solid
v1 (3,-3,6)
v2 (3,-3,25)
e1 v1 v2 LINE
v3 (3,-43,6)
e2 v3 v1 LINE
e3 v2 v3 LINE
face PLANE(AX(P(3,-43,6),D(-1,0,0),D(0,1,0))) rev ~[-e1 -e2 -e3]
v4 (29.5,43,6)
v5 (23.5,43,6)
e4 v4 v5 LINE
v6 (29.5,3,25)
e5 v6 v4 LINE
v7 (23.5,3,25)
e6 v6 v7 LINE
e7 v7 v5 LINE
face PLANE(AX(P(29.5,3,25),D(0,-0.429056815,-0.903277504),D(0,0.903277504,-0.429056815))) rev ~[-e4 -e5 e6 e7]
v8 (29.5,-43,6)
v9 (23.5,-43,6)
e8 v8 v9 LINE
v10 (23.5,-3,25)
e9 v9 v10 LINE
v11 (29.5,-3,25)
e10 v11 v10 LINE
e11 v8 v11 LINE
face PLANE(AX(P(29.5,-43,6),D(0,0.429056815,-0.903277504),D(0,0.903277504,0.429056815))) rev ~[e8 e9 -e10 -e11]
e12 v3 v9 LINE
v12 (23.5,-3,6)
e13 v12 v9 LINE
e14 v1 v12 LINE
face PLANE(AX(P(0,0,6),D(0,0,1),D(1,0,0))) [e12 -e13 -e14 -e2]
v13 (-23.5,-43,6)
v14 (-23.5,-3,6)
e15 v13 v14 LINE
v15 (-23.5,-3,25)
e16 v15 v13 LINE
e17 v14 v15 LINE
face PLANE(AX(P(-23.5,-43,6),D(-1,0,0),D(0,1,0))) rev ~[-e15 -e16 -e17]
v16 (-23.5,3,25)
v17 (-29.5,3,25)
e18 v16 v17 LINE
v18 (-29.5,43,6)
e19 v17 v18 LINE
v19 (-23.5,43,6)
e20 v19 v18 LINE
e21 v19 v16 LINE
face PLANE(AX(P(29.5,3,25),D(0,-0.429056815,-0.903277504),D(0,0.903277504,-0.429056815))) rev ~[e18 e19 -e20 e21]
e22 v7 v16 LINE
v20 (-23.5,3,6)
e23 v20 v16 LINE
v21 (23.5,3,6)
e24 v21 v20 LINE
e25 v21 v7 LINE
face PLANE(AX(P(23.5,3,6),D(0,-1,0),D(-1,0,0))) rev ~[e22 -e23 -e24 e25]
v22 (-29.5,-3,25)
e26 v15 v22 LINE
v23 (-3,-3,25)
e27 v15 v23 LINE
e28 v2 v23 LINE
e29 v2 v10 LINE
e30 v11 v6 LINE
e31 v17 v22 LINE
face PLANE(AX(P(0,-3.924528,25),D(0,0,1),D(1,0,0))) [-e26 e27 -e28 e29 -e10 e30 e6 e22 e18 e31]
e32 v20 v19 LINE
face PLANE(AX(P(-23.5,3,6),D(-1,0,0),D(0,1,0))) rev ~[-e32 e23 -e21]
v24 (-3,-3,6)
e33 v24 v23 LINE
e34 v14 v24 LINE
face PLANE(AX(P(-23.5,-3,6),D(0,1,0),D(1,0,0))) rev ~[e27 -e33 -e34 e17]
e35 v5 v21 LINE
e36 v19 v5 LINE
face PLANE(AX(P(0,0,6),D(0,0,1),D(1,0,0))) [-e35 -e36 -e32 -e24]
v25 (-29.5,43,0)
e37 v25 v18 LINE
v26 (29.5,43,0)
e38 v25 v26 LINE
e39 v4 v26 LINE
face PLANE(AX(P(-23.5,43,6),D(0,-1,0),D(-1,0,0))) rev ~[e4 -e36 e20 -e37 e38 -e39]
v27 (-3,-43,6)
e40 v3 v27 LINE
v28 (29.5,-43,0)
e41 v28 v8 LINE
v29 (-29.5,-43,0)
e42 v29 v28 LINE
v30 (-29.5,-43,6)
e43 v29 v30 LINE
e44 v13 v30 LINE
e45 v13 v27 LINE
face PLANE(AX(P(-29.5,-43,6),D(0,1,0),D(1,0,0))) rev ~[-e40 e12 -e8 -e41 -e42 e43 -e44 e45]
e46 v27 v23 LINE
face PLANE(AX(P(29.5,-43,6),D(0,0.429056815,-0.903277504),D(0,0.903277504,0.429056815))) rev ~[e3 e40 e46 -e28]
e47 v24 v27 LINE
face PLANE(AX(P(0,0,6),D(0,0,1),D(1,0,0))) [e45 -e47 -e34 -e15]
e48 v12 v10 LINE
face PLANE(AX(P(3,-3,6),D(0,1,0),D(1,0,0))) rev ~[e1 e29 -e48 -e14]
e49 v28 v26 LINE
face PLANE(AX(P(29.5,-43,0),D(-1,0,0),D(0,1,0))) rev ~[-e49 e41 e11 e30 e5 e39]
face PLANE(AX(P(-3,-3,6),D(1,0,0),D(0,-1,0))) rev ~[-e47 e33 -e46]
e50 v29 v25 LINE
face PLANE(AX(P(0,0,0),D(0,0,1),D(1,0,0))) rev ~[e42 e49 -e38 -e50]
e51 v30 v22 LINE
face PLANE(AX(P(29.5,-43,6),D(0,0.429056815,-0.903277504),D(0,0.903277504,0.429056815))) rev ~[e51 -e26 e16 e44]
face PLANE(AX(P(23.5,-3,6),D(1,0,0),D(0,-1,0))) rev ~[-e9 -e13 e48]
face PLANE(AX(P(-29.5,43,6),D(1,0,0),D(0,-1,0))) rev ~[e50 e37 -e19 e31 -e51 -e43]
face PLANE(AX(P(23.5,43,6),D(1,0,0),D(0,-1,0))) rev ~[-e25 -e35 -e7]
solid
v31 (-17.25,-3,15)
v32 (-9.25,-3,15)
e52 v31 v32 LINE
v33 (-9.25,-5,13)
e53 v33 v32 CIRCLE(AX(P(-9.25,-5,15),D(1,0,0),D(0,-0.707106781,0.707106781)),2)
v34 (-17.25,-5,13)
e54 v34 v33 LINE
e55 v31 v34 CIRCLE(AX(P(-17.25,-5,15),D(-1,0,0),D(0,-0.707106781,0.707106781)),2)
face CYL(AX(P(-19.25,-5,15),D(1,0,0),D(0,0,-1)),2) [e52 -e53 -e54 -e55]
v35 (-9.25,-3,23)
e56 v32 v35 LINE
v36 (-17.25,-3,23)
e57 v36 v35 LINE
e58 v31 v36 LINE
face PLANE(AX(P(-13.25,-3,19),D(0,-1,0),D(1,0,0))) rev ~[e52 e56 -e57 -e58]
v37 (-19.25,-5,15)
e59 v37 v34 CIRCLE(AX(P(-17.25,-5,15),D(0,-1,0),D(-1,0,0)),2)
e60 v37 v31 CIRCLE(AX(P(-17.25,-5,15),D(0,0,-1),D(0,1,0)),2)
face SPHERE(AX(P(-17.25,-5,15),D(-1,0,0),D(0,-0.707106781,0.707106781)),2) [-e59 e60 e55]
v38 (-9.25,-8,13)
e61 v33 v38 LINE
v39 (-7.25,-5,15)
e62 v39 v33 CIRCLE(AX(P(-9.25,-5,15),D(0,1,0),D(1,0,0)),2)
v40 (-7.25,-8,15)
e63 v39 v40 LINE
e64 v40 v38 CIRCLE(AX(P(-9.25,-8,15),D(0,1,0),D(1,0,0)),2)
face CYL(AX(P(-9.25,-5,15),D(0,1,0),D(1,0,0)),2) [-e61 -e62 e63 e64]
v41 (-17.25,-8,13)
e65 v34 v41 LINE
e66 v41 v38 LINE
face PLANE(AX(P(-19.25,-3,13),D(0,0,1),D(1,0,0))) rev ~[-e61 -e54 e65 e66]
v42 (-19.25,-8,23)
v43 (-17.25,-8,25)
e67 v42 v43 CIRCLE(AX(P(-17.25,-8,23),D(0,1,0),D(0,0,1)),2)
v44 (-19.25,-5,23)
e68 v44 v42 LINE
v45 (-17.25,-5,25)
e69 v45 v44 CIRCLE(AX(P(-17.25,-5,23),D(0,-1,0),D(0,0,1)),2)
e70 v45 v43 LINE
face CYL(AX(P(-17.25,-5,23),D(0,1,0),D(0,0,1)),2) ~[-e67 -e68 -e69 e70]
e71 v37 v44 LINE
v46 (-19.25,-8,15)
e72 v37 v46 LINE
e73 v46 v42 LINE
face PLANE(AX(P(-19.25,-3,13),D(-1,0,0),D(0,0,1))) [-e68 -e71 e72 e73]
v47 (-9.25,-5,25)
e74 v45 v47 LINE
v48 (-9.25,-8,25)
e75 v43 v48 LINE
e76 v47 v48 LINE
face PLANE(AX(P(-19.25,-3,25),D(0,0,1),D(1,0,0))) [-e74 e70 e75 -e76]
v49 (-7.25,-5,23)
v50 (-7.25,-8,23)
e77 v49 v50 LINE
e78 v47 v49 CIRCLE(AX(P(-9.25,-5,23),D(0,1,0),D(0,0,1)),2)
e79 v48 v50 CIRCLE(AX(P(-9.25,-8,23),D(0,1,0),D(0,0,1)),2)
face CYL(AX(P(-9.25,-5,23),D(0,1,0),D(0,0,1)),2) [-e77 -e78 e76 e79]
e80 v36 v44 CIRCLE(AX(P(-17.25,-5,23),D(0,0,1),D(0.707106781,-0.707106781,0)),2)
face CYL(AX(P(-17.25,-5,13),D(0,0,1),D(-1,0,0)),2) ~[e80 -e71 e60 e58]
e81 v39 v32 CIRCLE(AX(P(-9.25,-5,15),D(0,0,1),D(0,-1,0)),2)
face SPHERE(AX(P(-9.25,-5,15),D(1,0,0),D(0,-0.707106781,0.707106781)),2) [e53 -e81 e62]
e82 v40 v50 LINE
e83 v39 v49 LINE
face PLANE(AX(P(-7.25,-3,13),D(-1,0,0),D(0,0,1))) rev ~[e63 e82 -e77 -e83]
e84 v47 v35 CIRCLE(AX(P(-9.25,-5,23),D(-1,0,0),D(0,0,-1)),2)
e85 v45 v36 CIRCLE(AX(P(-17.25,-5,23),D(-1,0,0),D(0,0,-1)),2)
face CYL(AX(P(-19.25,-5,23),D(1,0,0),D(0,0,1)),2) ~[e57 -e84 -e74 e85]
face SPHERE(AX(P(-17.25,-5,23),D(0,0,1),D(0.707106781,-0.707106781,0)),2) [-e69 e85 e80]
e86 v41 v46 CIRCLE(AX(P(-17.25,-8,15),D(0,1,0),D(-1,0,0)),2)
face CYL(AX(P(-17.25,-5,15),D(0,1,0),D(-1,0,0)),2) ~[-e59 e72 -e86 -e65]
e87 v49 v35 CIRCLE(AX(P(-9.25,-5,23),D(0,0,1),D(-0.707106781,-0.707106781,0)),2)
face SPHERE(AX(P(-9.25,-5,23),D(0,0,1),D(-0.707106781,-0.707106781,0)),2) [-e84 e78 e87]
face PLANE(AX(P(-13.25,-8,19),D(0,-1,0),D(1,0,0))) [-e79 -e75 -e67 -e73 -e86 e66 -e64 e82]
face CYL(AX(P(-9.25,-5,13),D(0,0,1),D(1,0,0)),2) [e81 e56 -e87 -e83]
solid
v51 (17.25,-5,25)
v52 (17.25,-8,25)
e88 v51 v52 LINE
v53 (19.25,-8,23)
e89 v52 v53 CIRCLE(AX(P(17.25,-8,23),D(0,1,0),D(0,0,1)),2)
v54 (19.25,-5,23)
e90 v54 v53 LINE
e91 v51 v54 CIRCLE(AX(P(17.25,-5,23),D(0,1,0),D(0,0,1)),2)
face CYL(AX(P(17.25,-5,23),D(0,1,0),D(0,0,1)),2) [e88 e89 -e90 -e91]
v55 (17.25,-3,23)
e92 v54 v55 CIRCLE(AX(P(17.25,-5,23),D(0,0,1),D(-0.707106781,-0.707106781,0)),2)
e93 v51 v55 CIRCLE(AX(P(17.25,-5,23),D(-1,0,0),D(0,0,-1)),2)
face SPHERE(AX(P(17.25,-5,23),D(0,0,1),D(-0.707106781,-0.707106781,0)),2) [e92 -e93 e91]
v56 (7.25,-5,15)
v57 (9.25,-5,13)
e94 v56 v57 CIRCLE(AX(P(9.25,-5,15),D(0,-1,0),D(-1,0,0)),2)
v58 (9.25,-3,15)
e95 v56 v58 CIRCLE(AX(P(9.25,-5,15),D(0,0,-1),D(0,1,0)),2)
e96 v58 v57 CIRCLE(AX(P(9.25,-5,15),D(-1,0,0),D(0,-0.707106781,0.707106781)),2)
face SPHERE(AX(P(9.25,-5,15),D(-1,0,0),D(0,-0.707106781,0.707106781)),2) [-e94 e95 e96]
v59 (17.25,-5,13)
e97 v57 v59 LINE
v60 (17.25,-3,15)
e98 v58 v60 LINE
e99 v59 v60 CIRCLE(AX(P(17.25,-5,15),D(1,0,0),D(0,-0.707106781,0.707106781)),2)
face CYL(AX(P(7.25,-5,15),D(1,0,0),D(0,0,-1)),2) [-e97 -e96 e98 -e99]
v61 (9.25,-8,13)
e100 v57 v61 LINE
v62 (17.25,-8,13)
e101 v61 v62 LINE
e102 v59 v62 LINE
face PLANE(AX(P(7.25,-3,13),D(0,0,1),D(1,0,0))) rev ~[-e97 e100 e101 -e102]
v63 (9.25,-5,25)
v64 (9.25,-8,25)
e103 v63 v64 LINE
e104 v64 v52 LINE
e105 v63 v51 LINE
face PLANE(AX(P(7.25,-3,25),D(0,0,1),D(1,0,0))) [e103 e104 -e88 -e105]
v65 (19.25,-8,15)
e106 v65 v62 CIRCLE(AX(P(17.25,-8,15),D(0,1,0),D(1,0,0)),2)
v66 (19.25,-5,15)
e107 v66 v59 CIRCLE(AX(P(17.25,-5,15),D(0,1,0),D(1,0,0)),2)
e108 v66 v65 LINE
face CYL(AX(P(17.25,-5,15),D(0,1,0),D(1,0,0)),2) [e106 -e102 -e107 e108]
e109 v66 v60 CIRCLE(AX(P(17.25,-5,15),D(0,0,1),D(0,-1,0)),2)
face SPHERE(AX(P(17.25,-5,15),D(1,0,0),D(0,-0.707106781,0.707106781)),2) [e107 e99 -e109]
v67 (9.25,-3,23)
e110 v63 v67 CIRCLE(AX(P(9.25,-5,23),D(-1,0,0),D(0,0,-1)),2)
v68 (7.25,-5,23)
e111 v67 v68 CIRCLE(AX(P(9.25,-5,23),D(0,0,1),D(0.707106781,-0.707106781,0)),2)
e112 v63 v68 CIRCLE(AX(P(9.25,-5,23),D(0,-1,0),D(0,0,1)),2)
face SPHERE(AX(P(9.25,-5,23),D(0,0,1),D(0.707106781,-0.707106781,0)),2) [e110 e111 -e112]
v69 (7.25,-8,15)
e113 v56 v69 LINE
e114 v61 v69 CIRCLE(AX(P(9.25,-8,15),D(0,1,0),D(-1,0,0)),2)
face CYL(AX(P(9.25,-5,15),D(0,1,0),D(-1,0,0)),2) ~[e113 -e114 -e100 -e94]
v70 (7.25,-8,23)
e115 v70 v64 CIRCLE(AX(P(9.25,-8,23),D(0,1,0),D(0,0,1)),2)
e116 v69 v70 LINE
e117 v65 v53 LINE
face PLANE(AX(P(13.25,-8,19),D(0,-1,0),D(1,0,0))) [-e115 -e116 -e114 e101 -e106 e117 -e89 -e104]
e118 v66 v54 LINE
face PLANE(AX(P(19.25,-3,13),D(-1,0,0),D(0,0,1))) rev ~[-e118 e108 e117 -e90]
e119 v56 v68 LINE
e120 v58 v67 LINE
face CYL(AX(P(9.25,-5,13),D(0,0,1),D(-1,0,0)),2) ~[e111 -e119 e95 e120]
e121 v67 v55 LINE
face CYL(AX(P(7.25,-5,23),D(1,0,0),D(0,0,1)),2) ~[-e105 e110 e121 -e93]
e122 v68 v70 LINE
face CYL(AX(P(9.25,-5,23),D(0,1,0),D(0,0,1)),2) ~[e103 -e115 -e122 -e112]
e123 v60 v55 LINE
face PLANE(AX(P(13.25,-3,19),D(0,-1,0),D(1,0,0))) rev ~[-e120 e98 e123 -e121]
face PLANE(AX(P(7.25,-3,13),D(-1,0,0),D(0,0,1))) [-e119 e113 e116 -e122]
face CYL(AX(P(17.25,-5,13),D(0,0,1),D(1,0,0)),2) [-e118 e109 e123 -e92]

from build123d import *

# Parameters (mm, degrees)
F0_W            = 59
F0_H            = 86
F1_DEPTH        = 6
F3_DEPTH        = 19
F5_DEPTH        = 59.001
F6_W            = 12
F6_H            = 12
F7_DEPTH        = 5
F8_R            = 2
F9_T1_DEPTH     = 8
F9_S5_W         = 2
F9_S5_H         = 2
F9_T6_DEPTH     = 2
F9_S11_W        = 2
F9_S11_H        = 2
F9_T12_DEPTH    = 2
F9_S17_W        = 2
F9_S17_H        = 2
F9_T18_DEPTH    = 2
F9_S23_W        = 2
F9_S23_H        = 2
F9_T24_DEPTH    = 2
F9_S1_T1_DEPTH  = 8
F9_S1_S5_W      = 2
F9_S1_S5_H      = 2
F9_S1_T6_DEPTH  = 2
F9_S1_S11_W     = 2
F9_S1_S11_H     = 2
F9_S1_T12_DEPTH = 2
F9_S1_S17_W     = 2
F9_S1_S17_H     = 2
F9_S1_T18_DEPTH = 2
F9_S1_S23_W     = 2
F9_S1_S23_H     = 2
F9_S1_T24_DEPTH = 2


# Not quite as in the source:
# - a fillet or chamfer that OpenCascade refuses, or shapes differently, is made with other operations: its cross-section is extruded or revolved along the edge and cut away or added


with BuildPart() as f1:
    # F0 (on Top) → F1 (new body)
    with BuildSketch(Plane.XY):
        Rectangle(F0_W, F0_H)
    extrude(amount=F1_DEPTH)

    # F2 (on face) → F3 (join)
    with BuildSketch(Plane.XY.offset(6)):
        Polygon((-23.5, 43), (-29.5, 43), (-29.5, -43), (-23.5, -43), (-23.5, -3), (-3, -3), (-3, -43), (3, -43), (3, -3), (23.5, -3), (23.5, -43), (29.5, -43), (29.5, 43), (23.5, 43), (23.5, 3), (-23.5, 3), align=None)
    extrude(amount=F3_DEPTH)

    # F4 (on face) → F5 (cut, through all)
    with BuildSketch(Plane.YZ.offset(29.5)):
        Polygon((-43, 25), (-43, 6), (-3, 25), align=None)
        Polygon((43, 25), (3, 25), (43, 6), align=None)
    extrude(amount=-F5_DEPTH, mode=Mode.SUBTRACT)


with BuildPart() as f7:
    # F6 (on face) → F7 (new body)
    with BuildSketch(Plane.XZ.offset(3)):
        with Locations((-13.25, 19)):
            Rectangle(F6_W, F6_H)
        with Locations((13.25, 19)):
            Rectangle(F6_W, F6_H)
    extrude(amount=F7_DEPTH)

    # F8
    f8_edges = [f7.edges().sort_by_distance(p)[0] for p in [
        (-7.25, -3, 19),
        (-13.25, -3, 25),
        (-19.25, -3, 19),
        (-13.25, -3, 13),
        (13.25, -3, 13),
        (7.25, -3, 19),
        (19.25, -3, 19),
        (13.25, -3, 25),
    ]]
    fillet(f8_edges, radius=F8_R)

    # F9: fillet of radius 2 on 4 edges, made by hand

    # F9_s2 → F9_t1 (cut)
    with BuildSketch(Plane.XZ.offset(5)):
        with BuildLine():
            ThreePointArc((-7.25, 15), (-7.8357864376, 13.5857864376), (-9.25, 13))
            Line((-9.25, 13), (-7.25, 13))
            Line((-7.25, 13), (-7.25, 15))
        make_face()
        with BuildLine():
            ThreePointArc((-19.25, 15), (-18.6642135624, 13.5857864376), (-17.25, 13))
            Line((-17.25, 13), (-19.25, 13))
            Line((-19.25, 13), (-19.25, 15))
        make_face()
        with BuildLine():
            ThreePointArc((-9.25, 25), (-7.8357864376, 24.4142135624), (-7.25, 23))
            Line((-7.25, 23), (-7.25, 25))
            Line((-7.25, 25), (-9.25, 25))
        make_face()
        with BuildLine():
            ThreePointArc((-17.25, 25), (-18.6642135624, 24.4142135624), (-19.25, 23))
            Line((-19.25, 23), (-19.25, 25))
            Line((-19.25, 25), (-17.25, 25))
        make_face()
    extrude(amount=F9_T1_DEPTH, mode=Mode.SUBTRACT)


with BuildPart() as f9_tool4:
    # F9_s5 → F9_t6 (new body)
    with BuildSketch(Plane.XY.offset(23)):
        with Locations((-18.25, -4)):
            Rectangle(F9_S5_W, F9_S5_H)
    extrude(amount=F9_T6_DEPTH)

    # F9_s7 → F9_t8 (revolve, cut)
    with BuildSketch(Plane(origin=(-17.25, -5, 23), x_dir=(0.7071067812, -0.7071067812, 0), z_dir=(-0.7071067812, -0.7071067812, 0))):
        with BuildLine():
            ThreePointArc((0, -2), (2, 0), (0, 2))
            Line((0, 2), (0, -2))
        make_face()
    revolve(axis=Axis((-17.25, -5, 23), (0, 0, 1)), mode=Mode.SUBTRACT)


with BuildPart() as f7_1:
    add(f7.part)

    # F9_t3: cut F9_tool4
    add(f9_tool4.part, mode=Mode.SUBTRACT)


with BuildPart() as f9_tool10:
    # F9_s11 → F9_t12 (new body)
    with BuildSketch(Plane.XY.offset(23)):
        with Locations((-8.25, -4)):
            Rectangle(F9_S11_W, F9_S11_H)
    extrude(amount=F9_T12_DEPTH)

    # F9_s13 → F9_t14 (revolve, cut)
    with BuildSketch(Plane(origin=(-9.25, -5, 23), x_dir=(-0.7071067812, -0.7071067812, 0), z_dir=(-0.7071067812, 0.7071067812, 0))):
        with BuildLine():
            ThreePointArc((0, -2), (2, 0), (0, 2))
            Line((0, 2), (0, -2))
        make_face()
    revolve(axis=Axis((-9.25, -5, 23), (0, 0, 1)), mode=Mode.SUBTRACT)


with BuildPart() as f7_2:
    add(f7_1.part)

    # F9_t9: cut F9_tool10
    add(f9_tool10.part, mode=Mode.SUBTRACT)


with BuildPart() as f9_tool16:
    # F9_s17 → F9_t18 (new body)
    with BuildSketch(Plane.YZ.offset(-17.25)):
        with Locations((-4, 14)):
            Rectangle(F9_S17_W, F9_S17_H)
    extrude(amount=-F9_T18_DEPTH)

    # F9_s19 → F9_t20 (revolve, cut)
    with BuildSketch(Plane(origin=(-17.25, -5, 15), x_dir=(0, -0.7071067812, 0.7071067812), z_dir=(0, -0.7071067812, -0.7071067812))):
        with BuildLine():
            ThreePointArc((0, -2), (2, 0), (0, 2))
            Line((0, 2), (0, -2))
        make_face()
    revolve(axis=Axis((-17.25, -5, 15), (-1, 0, 0)), mode=Mode.SUBTRACT)


with BuildPart() as f7_3:
    add(f7_2.part)

    # F9_t15: cut F9_tool16
    add(f9_tool16.part, mode=Mode.SUBTRACT)


with BuildPart() as f9_tool22:
    # F9_s23 → F9_t24 (new body)
    with BuildSketch(Plane.YZ.offset(-9.25)):
        with Locations((-4, 14)):
            Rectangle(F9_S23_W, F9_S23_H)
    extrude(amount=F9_T24_DEPTH)

    # F9_s25 → F9_t26 (revolve, cut)
    with BuildSketch(Plane(origin=(-9.25, -5, 15), x_dir=(0, -0.7071067812, 0.7071067812), z_dir=(0, 0.7071067812, 0.7071067812))):
        with BuildLine():
            ThreePointArc((0, -2), (2, 0), (0, 2))
            Line((0, 2), (0, -2))
        make_face()
    revolve(axis=Axis((-9.25, -5, 15), (1, 0, 0)), mode=Mode.SUBTRACT)


with BuildPart() as f7_4:
    add(f7_3.part)

    # F9_t21: cut F9_tool22
    add(f9_tool22.part, mode=Mode.SUBTRACT)

    # F9#s1: fillet of radius 2 on 4 edges, made by hand

    # F9_s1_s2 → F9_s1_t1 (cut)
    with BuildSketch(Plane.XZ.offset(5)):
        with BuildLine():
            ThreePointArc((19.25, 15), (18.6642135624, 13.5857864376), (17.25, 13))
            Line((17.25, 13), (19.25, 13))
            Line((19.25, 13), (19.25, 15))
        make_face()
        with BuildLine():
            ThreePointArc((17.25, 25), (18.6642135624, 24.4142135624), (19.25, 23))
            Line((19.25, 23), (19.25, 25))
            Line((19.25, 25), (17.25, 25))
        make_face()
        with BuildLine():
            ThreePointArc((7.25, 15), (7.8357864376, 13.5857864376), (9.25, 13))
            Line((9.25, 13), (7.25, 13))
            Line((7.25, 13), (7.25, 15))
        make_face()
        with BuildLine():
            ThreePointArc((9.25, 25), (7.8357864376, 24.4142135624), (7.25, 23))
            Line((7.25, 23), (7.25, 25))
            Line((7.25, 25), (9.25, 25))
        make_face()
    extrude(amount=F9_S1_T1_DEPTH, mode=Mode.SUBTRACT)


with BuildPart() as f9_s1_tool4:
    # F9_s1_s5 → F9_s1_t6 (new body)
    with BuildSketch(Plane.XY.offset(23)):
        with Locations((8.25, -4)):
            Rectangle(F9_S1_S5_W, F9_S1_S5_H)
    extrude(amount=F9_S1_T6_DEPTH)

    # F9_s1_s7 → F9_s1_t8 (revolve, cut)
    with BuildSketch(Plane(origin=(9.25, -5, 23), x_dir=(0.7071067812, -0.7071067812, 0), z_dir=(-0.7071067812, -0.7071067812, 0))):
        with BuildLine():
            ThreePointArc((0, -2), (2, 0), (0, 2))
            Line((0, 2), (0, -2))
        make_face()
    revolve(axis=Axis((9.25, -5, 23), (0, 0, 1)), mode=Mode.SUBTRACT)


with BuildPart() as f7_5:
    add(f7_4.part)

    # F9_s1_t3: cut F9_s1_tool4
    add(f9_s1_tool4.part, mode=Mode.SUBTRACT)


with BuildPart() as f9_s1_tool10:
    # F9_s1_s11 → F9_s1_t12 (new body)
    with BuildSketch(Plane.YZ.offset(9.25)):
        with Locations((-4, 14)):
            Rectangle(F9_S1_S11_W, F9_S1_S11_H)
    extrude(amount=-F9_S1_T12_DEPTH)

    # F9_s1_s13 → F9_s1_t14 (revolve, cut)
    with BuildSketch(Plane(origin=(9.25, -5, 15), x_dir=(0, -0.7071067812, 0.7071067812), z_dir=(0, -0.7071067812, -0.7071067812))):
        with BuildLine():
            ThreePointArc((0, -2), (2, 0), (0, 2))
            Line((0, 2), (0, -2))
        make_face()
    revolve(axis=Axis((9.25, -5, 15), (-1, 0, 0)), mode=Mode.SUBTRACT)


with BuildPart() as f7_6:
    add(f7_5.part)

    # F9_s1_t9: cut F9_s1_tool10
    add(f9_s1_tool10.part, mode=Mode.SUBTRACT)


with BuildPart() as f9_s1_tool16:
    # F9_s1_s17 → F9_s1_t18 (new body)
    with BuildSketch(Plane.XY.offset(23)):
        with Locations((18.25, -4)):
            Rectangle(F9_S1_S17_W, F9_S1_S17_H)
    extrude(amount=F9_S1_T18_DEPTH)

    # F9_s1_s19 → F9_s1_t20 (revolve, cut)
    with BuildSketch(Plane(origin=(17.25, -5, 23), x_dir=(-0.7071067812, -0.7071067812, 0), z_dir=(-0.7071067812, 0.7071067812, 0))):
        with BuildLine():
            ThreePointArc((0, -2), (2, 0), (0, 2))
            Line((0, 2), (0, -2))
        make_face()
    revolve(axis=Axis((17.25, -5, 23), (0, 0, 1)), mode=Mode.SUBTRACT)


with BuildPart() as f7_7:
    add(f7_6.part)

    # F9_s1_t15: cut F9_s1_tool16
    add(f9_s1_tool16.part, mode=Mode.SUBTRACT)


with BuildPart() as f9_s1_tool22:
    # F9_s1_s23 → F9_s1_t24 (new body)
    with BuildSketch(Plane.YZ.offset(17.25)):
        with Locations((-4, 14)):
            Rectangle(F9_S1_S23_W, F9_S1_S23_H)
    extrude(amount=F9_S1_T24_DEPTH)

    # F9_s1_s25 → F9_s1_t26 (revolve, cut)
    with BuildSketch(Plane(origin=(17.25, -5, 15), x_dir=(0, -0.7071067812, 0.7071067812), z_dir=(0, 0.7071067812, 0.7071067812))):
        with BuildLine():
            ThreePointArc((0, -2), (2, 0), (0, 2))
            Line((0, 2), (0, -2))
        make_face()
    revolve(axis=Axis((17.25, -5, 15), (1, 0, 0)), mode=Mode.SUBTRACT)


with BuildPart() as f7_8:
    add(f7_7.part)

    # F9_s1_t21: cut F9_s1_tool22
    add(f9_s1_tool22.part, mode=Mode.SUBTRACT)


solid = Compound([f1.part, f7_8.part])
